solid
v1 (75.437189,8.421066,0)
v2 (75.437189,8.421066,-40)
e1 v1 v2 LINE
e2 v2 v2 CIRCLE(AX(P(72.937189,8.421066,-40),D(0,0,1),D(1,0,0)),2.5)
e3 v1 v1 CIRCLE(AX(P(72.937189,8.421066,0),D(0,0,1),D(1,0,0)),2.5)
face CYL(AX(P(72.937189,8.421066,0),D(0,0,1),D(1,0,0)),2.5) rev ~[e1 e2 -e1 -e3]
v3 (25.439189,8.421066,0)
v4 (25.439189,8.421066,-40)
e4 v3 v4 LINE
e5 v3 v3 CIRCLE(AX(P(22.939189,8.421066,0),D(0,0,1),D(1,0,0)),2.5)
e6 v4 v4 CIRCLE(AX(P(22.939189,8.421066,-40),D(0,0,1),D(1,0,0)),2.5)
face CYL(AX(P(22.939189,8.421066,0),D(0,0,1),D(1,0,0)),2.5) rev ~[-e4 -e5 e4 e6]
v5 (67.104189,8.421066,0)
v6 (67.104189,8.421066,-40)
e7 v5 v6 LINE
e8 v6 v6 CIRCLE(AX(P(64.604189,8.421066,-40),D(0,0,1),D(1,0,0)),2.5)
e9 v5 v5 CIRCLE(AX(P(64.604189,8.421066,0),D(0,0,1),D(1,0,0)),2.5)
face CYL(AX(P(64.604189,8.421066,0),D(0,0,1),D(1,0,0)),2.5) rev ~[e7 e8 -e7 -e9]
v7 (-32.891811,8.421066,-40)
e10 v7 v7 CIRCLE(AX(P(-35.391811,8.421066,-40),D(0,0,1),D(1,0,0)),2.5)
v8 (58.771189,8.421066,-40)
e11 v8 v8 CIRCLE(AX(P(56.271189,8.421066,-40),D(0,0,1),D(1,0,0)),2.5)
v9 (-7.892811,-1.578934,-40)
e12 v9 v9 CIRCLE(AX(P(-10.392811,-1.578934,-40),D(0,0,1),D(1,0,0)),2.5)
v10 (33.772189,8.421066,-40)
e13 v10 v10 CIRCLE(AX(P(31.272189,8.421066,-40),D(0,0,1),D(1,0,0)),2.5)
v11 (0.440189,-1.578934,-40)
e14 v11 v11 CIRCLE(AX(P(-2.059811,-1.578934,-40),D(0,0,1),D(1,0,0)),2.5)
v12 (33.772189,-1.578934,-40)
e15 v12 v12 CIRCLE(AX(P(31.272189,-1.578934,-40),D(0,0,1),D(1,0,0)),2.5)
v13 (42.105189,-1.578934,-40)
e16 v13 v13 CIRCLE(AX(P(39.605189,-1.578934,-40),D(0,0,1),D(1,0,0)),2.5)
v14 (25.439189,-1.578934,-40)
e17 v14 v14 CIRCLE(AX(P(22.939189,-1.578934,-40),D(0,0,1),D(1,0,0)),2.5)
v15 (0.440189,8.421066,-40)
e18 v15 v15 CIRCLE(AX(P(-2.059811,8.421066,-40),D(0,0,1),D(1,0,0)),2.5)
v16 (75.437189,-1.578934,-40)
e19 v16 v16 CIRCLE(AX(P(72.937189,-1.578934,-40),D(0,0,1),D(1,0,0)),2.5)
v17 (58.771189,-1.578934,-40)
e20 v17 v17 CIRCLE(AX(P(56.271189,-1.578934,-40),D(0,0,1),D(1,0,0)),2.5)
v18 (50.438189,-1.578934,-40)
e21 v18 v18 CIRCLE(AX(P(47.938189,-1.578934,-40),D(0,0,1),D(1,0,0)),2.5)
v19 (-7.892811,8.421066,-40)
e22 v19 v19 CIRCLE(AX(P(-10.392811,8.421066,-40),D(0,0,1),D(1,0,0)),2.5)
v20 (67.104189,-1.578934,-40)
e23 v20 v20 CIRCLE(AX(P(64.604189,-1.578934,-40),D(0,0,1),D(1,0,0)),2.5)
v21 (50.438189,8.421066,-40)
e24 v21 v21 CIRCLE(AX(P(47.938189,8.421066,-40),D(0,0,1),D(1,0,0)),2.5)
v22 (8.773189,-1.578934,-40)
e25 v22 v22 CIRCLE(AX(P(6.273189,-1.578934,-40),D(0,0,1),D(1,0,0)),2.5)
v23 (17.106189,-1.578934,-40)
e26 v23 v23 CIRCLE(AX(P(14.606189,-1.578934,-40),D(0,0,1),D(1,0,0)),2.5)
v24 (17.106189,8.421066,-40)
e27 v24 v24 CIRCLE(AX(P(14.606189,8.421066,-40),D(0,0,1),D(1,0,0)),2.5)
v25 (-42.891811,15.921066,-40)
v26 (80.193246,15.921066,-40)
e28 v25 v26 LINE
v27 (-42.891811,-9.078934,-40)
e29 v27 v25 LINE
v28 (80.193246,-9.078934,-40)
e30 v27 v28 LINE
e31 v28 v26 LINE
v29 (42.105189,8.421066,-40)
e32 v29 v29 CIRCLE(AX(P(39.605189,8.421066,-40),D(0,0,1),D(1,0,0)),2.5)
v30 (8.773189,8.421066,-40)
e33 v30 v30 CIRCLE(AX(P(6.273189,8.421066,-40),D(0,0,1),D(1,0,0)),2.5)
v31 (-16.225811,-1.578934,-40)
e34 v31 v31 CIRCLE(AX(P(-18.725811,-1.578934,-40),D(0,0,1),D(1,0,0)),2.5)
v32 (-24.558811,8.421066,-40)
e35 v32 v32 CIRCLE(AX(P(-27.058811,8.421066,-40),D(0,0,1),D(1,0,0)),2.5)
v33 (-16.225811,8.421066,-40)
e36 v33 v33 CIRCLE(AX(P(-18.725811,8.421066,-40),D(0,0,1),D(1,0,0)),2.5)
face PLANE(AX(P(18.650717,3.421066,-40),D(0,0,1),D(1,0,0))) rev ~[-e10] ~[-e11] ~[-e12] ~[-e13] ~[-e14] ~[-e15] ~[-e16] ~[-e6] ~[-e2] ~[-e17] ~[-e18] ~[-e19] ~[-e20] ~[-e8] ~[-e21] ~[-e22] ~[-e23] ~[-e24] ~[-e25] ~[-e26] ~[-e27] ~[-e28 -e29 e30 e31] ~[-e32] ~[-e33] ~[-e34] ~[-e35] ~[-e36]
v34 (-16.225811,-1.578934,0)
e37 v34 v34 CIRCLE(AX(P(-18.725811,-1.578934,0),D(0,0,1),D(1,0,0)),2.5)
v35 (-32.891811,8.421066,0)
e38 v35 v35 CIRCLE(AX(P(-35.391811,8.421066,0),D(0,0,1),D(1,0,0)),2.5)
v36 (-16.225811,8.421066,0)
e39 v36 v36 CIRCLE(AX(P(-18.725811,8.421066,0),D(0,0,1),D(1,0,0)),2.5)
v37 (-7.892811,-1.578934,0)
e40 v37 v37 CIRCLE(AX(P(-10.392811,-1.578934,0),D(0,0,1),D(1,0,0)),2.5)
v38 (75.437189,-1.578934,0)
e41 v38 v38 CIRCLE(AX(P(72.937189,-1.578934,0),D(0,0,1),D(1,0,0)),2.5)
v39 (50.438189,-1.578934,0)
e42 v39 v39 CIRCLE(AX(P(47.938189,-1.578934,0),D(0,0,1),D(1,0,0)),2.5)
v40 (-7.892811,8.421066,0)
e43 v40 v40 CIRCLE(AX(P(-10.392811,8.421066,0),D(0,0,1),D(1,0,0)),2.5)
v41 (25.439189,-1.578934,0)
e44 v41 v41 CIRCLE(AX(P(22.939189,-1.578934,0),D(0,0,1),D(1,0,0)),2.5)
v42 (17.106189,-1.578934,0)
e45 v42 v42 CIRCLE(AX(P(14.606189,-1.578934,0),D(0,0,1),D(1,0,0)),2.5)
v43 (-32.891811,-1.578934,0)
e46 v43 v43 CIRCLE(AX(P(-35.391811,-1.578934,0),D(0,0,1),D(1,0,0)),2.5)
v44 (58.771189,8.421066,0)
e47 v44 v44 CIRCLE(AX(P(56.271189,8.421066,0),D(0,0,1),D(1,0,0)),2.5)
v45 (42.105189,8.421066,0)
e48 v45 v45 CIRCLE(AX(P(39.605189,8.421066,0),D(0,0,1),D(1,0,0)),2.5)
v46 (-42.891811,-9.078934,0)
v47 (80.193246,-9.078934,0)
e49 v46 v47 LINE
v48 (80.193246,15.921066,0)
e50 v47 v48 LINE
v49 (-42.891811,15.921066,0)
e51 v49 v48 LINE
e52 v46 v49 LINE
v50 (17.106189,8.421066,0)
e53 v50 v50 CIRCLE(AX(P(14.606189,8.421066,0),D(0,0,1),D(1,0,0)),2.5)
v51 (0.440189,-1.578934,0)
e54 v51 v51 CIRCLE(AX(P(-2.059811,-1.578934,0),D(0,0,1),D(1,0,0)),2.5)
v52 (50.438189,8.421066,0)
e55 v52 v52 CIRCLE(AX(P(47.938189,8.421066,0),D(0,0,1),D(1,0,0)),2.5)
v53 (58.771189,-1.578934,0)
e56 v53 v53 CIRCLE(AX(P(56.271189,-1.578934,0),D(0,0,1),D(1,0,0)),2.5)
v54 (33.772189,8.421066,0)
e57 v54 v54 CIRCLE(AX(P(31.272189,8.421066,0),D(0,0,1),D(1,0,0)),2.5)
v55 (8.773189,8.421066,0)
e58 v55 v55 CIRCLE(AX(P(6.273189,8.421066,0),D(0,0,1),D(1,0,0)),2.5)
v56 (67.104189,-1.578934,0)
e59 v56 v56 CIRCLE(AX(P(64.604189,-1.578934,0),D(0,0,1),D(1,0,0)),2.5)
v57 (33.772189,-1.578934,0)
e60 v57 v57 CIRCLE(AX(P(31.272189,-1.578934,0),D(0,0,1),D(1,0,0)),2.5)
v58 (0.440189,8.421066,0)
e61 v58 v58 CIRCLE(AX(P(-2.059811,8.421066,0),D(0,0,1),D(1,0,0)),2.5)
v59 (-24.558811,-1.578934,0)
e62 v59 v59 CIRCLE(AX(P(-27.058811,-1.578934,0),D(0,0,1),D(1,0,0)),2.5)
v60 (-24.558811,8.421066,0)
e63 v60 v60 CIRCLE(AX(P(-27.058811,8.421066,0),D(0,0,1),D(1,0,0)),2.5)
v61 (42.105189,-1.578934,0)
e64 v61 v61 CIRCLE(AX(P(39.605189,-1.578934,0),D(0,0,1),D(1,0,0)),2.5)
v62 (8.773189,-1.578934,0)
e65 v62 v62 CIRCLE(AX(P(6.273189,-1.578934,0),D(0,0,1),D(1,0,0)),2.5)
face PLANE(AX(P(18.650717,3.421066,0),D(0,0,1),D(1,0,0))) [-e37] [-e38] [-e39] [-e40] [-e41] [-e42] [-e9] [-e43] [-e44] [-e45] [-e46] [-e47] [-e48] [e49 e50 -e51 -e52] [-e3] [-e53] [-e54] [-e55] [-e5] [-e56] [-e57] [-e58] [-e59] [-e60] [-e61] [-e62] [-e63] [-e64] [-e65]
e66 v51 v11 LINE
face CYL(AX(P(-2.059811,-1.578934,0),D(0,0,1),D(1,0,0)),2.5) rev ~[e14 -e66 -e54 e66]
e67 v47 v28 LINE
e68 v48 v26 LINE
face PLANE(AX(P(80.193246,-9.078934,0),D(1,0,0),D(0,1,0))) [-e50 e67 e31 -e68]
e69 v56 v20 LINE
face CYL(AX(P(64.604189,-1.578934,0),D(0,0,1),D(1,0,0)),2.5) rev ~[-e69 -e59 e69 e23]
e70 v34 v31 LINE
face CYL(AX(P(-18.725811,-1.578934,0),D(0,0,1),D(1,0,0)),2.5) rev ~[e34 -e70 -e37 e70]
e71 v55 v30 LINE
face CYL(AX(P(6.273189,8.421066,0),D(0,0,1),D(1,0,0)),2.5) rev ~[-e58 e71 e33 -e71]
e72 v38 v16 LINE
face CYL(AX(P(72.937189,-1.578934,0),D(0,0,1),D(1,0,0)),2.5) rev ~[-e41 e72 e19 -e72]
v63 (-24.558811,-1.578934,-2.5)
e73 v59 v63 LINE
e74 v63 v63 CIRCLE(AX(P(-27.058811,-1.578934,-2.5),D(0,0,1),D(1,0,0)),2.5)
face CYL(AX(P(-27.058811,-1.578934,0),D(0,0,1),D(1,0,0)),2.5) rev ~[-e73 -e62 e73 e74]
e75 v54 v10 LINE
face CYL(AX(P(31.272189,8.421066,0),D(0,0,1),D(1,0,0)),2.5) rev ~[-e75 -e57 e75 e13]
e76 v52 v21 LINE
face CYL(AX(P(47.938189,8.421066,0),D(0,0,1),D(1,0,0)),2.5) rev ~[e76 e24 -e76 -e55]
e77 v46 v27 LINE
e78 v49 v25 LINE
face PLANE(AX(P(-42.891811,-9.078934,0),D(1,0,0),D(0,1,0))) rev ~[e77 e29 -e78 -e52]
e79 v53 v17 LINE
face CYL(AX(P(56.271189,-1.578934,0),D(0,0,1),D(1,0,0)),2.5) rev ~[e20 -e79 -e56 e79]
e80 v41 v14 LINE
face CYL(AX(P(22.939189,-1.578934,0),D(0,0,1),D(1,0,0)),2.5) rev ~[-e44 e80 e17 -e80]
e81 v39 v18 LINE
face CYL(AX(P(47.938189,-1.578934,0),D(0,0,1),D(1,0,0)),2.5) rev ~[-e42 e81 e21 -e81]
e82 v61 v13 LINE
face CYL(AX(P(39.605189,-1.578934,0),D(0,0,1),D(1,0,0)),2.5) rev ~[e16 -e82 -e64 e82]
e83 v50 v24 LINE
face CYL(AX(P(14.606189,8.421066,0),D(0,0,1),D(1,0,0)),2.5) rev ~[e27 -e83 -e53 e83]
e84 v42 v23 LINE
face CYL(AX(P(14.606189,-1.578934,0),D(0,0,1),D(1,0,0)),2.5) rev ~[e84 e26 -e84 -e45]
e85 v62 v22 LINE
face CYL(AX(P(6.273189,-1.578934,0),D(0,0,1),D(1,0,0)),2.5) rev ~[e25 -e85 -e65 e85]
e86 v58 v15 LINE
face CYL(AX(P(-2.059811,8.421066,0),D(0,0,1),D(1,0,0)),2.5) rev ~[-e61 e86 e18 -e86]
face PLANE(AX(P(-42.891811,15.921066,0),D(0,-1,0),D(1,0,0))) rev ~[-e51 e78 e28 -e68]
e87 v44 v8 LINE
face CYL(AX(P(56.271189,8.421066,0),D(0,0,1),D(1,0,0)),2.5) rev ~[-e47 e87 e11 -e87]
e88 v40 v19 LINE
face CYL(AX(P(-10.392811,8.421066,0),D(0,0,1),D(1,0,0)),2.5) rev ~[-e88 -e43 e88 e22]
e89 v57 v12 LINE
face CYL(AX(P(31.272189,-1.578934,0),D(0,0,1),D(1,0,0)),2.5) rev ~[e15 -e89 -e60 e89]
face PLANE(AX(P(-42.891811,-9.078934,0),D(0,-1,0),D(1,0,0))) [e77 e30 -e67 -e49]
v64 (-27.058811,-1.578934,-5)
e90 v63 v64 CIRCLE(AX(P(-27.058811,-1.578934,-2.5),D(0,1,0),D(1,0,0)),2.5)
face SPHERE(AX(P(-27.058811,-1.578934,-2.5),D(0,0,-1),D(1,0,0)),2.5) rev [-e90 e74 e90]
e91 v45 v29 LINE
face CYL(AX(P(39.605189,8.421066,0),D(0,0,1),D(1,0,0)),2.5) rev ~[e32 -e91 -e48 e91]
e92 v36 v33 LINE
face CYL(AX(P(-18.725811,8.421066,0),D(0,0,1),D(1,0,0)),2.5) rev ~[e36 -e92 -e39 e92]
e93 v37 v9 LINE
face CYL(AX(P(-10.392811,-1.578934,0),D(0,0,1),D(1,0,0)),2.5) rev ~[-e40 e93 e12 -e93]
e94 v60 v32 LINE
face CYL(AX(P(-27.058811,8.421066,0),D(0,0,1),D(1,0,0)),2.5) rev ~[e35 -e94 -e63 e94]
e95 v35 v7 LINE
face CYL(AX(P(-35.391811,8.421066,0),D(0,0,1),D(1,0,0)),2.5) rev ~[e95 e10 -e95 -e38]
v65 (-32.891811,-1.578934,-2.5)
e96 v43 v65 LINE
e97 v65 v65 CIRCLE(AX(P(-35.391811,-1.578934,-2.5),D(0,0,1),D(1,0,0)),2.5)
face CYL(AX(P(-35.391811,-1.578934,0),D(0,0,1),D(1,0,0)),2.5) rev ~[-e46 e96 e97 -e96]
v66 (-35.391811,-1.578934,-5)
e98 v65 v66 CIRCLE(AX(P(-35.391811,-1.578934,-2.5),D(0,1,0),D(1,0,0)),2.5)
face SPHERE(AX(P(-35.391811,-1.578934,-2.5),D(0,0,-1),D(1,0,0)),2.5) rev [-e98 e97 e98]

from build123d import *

# Parameters (mm, degrees)
F0_W     = 123.0850573922
F0_H     = 25
F0_R     = 2.5
F1_DEPTH = 40
F2_DEPTH = 40
F3_DEPTH = 5
F4_R     = 2.5


# Not quite as in the source:
# - a feature names something its author has since deleted; it is built from what else it names


with BuildPart() as f1:
    # F0 (on Top) → F1 (new body)
    with BuildSketch(Plane.XY):
        with Locations((18.6507174147, 3.4210662183)):
            Rectangle(F0_W, F0_H)
        with Locations((-35.3918112814, -1.5789337817)):
            Circle(F0_R, mode=Mode.SUBTRACT)
        with Locations((-27.0588112814, -1.5789337817)):
            Circle(F0_R, mode=Mode.SUBTRACT)
        with Locations((-18.7258112814, -1.5789337817)):
            Circle(F0_R, mode=Mode.SUBTRACT)
        with Locations((-10.3928112814, -1.5789337817)):
            Circle(F0_R, mode=Mode.SUBTRACT)
        with Locations((-2.0598112814, -1.5789337817)):
            Circle(F0_R, mode=Mode.SUBTRACT)
        with Locations((6.2731887186, -1.5789337817)):
            Circle(F0_R, mode=Mode.SUBTRACT)
        with Locations((14.6061887186, -1.5789337817)):
            Circle(F0_R, mode=Mode.SUBTRACT)
        with Locations((22.9391887186, -1.5789337817)):
            Circle(F0_R, mode=Mode.SUBTRACT)
        with Locations((31.2721887186, -1.5789337817)):
            Circle(F0_R, mode=Mode.SUBTRACT)
        with Locations((39.6051887186, -1.5789337817)):
            Circle(F0_R, mode=Mode.SUBTRACT)
        with Locations((47.9381887186, -1.5789337817)):
            Circle(F0_R, mode=Mode.SUBTRACT)
        with Locations((56.2711887186, -1.5789337817)):
            Circle(F0_R, mode=Mode.SUBTRACT)
        with Locations((64.6041887186, -1.5789337817)):
            Circle(F0_R, mode=Mode.SUBTRACT)
        with Locations((72.9371887186, -1.5789337817)):
            Circle(F0_R, mode=Mode.SUBTRACT)
        with Locations((-35.3918112814, 8.4210662183)):
            Circle(F0_R, mode=Mode.SUBTRACT)
        with Locations((-27.0588112814, 8.4210662183)):
            Circle(F0_R, mode=Mode.SUBTRACT)
        with Locations((-18.7258112814, 8.4210662183)):
            Circle(F0_R, mode=Mode.SUBTRACT)
        with Locations((-10.3928112814, 8.4210662183)):
            Circle(F0_R, mode=Mode.SUBTRACT)
        with Locations((-2.0598112814, 8.4210662183)):
            Circle(F0_R, mode=Mode.SUBTRACT)
        with Locations((6.2731887186, 8.4210662183)):
            Circle(F0_R, mode=Mode.SUBTRACT)
        with Locations((14.6061887186, 8.4210662183)):
            Circle(F0_R, mode=Mode.SUBTRACT)
        with Locations((22.9391887186, 8.4210662183)):
            Circle(F0_R, mode=Mode.SUBTRACT)
        with Locations((31.2721887186, 8.4210662183)):
            Circle(F0_R, mode=Mode.SUBTRACT)
        with Locations((39.6051887186, 8.4210662183)):
            Circle(F0_R, mode=Mode.SUBTRACT)
        with Locations((47.9381887186, 8.4210662183)):
            Circle(F0_R, mode=Mode.SUBTRACT)
        with Locations((56.2711887186, 8.4210662183)):
            Circle(F0_R, mode=Mode.SUBTRACT)
        with Locations((64.6041887186, 8.4210662183)):
            Circle(F0_R, mode=Mode.SUBTRACT)
        with Locations((72.9371887186, 8.4210662183)):
            Circle(F0_R, mode=Mode.SUBTRACT)
        with Locations((-35.3918112814, 8.4210662183)):
            Circle(F0_R)
        with Locations((-27.0588112814, 8.4210662183)):
            Circle(F0_R)
        with Locations((-27.0588112814, -1.5789337817)):
            Circle(F0_R)
        with Locations((-35.3918112814, -1.5789337817)):
            Circle(F0_R)
    extrude(amount=-F1_DEPTH)

    # F0 (on Top) → F2 (cut)
    with BuildSketch(Plane.XY):
        with Locations((-35.3918112814, 8.4210662183)):
            Circle(F0_R)
        with Locations((-27.0588112814, 8.4210662183)):
            Circle(F0_R)
        with Locations((-18.7258112814, 8.4210662183)):
            Circle(F0_R)
        with Locations((-10.3928112814, 8.4210662183)):
            Circle(F0_R)
        with Locations((-2.0598112814, 8.4210662183)):
            Circle(F0_R)
        with Locations((6.2731887186, 8.4210662183)):
            Circle(F0_R)
        with Locations((14.6061887186, 8.4210662183)):
            Circle(F0_R)
        with Locations((22.9391887186, 8.4210662183)):
            Circle(F0_R)
        with Locations((31.2721887186, 8.4210662183)):
            Circle(F0_R)
        with Locations((39.6051887186, 8.4210662183)):
            Circle(F0_R)
        with Locations((47.9381887186, 8.4210662183)):
            Circle(F0_R)
        with Locations((56.2711887186, 8.4210662183)):
            Circle(F0_R)
        with Locations((64.6041887186, 8.4210662183)):
            Circle(F0_R)
        with Locations((72.9371887186, 8.4210662183)):
            Circle(F0_R)
    extrude(amount=-F2_DEPTH, mode=Mode.SUBTRACT)

    # F0 (on Top) → F3 (cut)
    with BuildSketch(Plane.XY):
        with Locations((-35.3918112814, -1.5789337817)):
            Circle(F0_R)
        with Locations((-27.0588112814, -1.5789337817)):
            Circle(F0_R)
    extrude(amount=-F3_DEPTH, mode=Mode.SUBTRACT)

    # F4
    f4_edges = [f1.edges().sort_by_distance(p)[0] for p in [
        (-37.891811, -1.578934, -5),
        (-29.558811, -1.578934, -5),
    ]]
    fillet(f4_edges, radius=F4_R)


solid = f1.part
